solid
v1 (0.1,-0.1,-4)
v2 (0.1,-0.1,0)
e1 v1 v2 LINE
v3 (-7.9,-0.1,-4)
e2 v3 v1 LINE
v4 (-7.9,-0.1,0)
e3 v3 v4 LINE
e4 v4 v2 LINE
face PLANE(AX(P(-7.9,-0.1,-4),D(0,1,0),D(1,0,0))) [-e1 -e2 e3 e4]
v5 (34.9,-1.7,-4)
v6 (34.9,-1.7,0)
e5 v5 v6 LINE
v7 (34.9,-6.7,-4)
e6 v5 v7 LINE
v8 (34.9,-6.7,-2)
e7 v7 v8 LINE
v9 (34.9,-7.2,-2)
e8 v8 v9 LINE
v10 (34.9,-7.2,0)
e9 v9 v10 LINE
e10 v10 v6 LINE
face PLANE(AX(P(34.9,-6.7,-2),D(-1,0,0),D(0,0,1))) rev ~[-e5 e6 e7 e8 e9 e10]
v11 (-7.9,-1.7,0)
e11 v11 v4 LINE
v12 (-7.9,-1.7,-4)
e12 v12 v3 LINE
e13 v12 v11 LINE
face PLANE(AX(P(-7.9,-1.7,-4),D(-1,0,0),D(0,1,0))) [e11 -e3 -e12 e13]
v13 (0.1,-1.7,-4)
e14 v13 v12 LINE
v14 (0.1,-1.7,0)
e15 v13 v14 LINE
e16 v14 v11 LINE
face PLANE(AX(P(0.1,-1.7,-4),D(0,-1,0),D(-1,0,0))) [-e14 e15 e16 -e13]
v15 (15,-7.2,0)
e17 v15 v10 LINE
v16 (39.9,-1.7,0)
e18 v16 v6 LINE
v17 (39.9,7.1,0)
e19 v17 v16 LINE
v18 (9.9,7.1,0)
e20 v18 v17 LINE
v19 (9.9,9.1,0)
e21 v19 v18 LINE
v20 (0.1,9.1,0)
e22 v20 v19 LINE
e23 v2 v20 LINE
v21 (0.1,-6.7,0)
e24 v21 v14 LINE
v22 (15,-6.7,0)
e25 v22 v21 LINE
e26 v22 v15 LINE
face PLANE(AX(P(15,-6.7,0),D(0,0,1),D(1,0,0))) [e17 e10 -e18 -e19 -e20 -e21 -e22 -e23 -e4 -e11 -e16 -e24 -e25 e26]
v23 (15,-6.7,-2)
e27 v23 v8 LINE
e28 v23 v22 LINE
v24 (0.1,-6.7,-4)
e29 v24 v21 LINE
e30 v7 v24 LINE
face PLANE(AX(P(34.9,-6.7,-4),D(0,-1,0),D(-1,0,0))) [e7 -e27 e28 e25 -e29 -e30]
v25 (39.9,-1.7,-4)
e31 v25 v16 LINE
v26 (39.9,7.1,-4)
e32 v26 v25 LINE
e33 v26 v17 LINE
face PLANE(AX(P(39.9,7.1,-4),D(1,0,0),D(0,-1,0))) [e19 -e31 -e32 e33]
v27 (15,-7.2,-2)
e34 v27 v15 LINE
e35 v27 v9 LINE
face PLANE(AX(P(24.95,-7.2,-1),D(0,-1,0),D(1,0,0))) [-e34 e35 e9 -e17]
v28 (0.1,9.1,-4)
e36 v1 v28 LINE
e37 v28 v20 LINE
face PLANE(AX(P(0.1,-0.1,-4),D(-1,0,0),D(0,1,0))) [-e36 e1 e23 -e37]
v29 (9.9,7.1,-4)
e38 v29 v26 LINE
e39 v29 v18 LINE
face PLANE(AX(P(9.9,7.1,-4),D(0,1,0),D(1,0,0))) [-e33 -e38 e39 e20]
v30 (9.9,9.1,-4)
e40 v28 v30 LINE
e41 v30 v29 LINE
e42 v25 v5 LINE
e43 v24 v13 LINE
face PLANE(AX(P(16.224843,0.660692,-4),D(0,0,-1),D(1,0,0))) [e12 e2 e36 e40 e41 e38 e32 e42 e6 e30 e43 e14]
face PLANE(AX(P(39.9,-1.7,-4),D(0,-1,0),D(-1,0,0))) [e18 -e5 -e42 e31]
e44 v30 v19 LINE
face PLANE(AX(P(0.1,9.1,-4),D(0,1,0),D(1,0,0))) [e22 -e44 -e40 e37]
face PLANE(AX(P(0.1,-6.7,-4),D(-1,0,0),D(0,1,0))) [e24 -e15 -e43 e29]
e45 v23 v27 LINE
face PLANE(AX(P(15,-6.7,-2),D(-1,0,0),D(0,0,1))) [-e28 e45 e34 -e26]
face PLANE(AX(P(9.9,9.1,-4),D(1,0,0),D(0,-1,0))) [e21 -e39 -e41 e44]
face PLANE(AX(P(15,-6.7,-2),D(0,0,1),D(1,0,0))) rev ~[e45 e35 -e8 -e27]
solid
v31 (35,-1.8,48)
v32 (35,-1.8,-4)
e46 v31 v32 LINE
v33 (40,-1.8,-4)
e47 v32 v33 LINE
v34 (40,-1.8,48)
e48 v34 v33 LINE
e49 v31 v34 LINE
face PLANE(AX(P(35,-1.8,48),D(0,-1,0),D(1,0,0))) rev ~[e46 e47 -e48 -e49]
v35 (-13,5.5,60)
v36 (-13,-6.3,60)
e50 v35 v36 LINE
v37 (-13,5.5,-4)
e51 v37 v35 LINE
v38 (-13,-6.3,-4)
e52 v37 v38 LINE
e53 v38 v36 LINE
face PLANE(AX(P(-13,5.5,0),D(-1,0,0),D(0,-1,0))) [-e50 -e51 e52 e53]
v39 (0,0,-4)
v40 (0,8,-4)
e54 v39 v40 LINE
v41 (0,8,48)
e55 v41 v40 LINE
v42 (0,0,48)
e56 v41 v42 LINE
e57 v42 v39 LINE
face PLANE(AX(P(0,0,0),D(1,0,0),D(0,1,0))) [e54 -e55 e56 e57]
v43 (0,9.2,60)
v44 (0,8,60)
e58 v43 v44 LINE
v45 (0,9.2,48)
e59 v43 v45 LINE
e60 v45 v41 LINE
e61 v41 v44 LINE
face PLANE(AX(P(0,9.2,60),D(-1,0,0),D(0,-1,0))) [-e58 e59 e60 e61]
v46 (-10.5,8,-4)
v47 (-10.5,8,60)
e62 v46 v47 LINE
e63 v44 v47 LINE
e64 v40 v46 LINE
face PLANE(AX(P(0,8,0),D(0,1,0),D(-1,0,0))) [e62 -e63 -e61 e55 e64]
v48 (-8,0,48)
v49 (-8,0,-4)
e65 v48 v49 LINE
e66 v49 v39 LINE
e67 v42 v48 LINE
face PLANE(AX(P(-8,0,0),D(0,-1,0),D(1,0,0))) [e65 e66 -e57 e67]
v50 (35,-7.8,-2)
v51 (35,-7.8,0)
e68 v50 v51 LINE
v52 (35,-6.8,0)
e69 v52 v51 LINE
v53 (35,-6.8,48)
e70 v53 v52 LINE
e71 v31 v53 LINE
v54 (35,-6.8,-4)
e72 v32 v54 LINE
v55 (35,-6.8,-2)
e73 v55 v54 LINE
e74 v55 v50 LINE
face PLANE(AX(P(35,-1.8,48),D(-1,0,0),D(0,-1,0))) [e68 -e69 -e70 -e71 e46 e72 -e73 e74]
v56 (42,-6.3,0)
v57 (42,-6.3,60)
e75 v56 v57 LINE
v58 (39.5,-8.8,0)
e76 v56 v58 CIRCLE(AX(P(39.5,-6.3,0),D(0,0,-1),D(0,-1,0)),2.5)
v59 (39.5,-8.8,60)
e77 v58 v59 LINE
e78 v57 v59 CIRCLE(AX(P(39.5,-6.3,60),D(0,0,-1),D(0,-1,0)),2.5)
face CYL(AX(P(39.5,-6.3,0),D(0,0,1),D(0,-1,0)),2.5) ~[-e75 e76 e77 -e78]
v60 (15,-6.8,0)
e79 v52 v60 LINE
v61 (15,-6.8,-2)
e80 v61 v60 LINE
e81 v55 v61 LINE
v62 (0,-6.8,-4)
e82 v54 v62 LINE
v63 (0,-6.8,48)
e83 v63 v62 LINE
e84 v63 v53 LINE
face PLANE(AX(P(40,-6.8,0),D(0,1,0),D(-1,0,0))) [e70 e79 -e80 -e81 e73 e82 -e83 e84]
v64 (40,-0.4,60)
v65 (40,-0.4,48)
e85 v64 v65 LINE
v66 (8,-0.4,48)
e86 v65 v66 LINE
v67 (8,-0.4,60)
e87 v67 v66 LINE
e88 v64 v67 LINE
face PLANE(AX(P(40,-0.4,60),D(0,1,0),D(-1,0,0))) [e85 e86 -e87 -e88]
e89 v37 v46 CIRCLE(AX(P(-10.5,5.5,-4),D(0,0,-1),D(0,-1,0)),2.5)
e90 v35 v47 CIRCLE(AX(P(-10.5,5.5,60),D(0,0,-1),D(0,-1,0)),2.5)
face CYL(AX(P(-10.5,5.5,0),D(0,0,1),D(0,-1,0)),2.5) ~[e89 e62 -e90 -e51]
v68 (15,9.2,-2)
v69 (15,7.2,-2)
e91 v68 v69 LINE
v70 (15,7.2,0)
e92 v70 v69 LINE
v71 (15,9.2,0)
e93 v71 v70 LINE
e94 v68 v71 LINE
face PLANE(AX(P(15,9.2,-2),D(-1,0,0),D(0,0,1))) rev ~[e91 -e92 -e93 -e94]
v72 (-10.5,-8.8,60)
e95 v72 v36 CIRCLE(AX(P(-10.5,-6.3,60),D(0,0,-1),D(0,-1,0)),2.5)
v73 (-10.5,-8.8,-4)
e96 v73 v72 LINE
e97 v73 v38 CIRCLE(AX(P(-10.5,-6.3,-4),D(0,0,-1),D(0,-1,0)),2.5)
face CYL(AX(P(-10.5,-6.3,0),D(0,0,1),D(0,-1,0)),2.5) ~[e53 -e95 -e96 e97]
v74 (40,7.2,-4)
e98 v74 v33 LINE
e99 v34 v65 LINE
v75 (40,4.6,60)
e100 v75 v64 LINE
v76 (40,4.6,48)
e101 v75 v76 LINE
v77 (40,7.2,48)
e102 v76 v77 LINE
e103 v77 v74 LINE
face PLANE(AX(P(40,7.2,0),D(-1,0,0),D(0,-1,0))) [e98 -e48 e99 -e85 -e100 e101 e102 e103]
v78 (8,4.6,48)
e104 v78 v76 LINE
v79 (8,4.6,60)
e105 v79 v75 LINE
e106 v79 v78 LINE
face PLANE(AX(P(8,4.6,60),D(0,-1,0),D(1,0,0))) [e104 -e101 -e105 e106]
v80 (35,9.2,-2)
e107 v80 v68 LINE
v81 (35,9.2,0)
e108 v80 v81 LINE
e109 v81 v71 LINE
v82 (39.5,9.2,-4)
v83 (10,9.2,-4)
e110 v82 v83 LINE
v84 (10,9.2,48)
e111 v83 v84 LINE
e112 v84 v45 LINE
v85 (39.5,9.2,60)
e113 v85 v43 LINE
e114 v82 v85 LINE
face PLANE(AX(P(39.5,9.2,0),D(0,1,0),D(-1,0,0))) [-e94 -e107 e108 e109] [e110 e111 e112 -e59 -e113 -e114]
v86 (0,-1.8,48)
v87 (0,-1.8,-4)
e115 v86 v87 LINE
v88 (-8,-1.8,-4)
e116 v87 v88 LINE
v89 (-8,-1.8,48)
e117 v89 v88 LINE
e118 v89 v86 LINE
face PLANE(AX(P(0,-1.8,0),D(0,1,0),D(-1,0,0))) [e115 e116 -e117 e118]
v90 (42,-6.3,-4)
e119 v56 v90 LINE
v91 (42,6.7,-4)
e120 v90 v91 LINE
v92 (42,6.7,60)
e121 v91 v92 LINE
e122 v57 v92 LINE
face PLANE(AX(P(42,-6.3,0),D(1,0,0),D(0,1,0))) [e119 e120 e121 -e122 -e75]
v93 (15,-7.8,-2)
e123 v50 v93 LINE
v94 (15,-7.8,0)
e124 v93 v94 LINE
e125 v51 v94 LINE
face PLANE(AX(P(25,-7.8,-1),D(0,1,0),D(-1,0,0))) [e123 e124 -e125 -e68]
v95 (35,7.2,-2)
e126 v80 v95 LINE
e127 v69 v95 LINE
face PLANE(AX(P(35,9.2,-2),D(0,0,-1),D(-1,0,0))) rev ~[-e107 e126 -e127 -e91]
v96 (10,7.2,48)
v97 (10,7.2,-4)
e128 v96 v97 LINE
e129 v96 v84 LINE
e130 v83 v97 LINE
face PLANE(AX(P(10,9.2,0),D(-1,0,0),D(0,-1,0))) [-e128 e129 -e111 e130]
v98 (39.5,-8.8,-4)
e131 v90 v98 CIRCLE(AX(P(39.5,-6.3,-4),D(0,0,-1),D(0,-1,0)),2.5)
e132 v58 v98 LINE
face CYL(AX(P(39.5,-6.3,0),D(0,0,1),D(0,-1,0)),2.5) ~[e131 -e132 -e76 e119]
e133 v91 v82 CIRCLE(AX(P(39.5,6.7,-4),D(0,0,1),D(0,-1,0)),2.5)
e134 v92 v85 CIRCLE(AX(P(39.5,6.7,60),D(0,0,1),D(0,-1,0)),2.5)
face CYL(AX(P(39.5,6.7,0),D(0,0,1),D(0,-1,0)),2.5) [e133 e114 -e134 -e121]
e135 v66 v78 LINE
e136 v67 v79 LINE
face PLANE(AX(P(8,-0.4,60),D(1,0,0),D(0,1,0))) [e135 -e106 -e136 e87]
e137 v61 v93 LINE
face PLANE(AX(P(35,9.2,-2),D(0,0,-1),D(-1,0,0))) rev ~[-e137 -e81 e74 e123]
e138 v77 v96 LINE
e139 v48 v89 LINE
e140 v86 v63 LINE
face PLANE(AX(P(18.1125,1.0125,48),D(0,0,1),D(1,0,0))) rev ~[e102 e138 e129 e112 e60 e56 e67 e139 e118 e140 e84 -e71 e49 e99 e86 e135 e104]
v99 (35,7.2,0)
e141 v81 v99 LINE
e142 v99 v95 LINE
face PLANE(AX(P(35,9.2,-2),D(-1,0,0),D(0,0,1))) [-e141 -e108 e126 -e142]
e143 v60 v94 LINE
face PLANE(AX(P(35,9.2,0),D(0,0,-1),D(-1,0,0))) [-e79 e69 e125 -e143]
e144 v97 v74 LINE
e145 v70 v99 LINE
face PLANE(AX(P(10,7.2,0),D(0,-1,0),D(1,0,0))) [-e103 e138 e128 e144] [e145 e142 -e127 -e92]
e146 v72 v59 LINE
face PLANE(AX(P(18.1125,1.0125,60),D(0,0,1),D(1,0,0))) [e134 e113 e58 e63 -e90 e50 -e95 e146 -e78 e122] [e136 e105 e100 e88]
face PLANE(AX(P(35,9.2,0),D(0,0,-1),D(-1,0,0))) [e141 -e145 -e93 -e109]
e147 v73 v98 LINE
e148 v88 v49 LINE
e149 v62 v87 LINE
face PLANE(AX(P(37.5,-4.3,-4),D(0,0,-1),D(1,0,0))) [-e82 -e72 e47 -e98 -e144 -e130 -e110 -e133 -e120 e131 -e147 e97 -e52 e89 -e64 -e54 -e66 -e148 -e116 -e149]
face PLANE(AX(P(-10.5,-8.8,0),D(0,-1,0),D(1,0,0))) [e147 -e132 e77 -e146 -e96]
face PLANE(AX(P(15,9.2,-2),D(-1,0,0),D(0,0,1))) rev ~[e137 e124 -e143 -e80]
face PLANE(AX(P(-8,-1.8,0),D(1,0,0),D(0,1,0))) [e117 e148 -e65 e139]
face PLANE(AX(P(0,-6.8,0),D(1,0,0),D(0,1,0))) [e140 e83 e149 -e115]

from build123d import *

# Parameters (mm, degrees)
F1_DEPTH  = 60
F3_DEPTH  = 12
F4_R      = 2.5
F5_DEPTH  = 4
F6_W      = 5
F6_H      = 5
F7_DEPTH  = 52
F8_W      = 20
F8_H      = 2
F9_DEPTH  = 17
F12_DEPTH = 4
F14_W     = 19.9
F14_H     = 2
F15_DEPTH = 0.5


# Not quite as in the source:
# - a feature names something its author has since deleted; it is built from what else it names


with BuildPart() as f1:
    # F0 (on Top) → F1 (new body)
    with BuildSketch(Plane.XY):
        Polygon((-8, 0), (0, 0), (0, 8), (-8, 8), (-13, 8), (-13, -6.8), (-13, -8.8), (42, -8.8), (42, 9.2), (10, 9.2), (10, 7.2), (40, 7.2), (40, -6.8), (0, -6.8), (0, -1.8), (-8, -1.8), align=None)
    extrude(amount=F1_DEPTH)

    # F2 (on face) → F3 (join)
    with BuildSketch(Plane.XY.offset(60)):
        Polygon((40, -0.4), (8, -0.4), (8, 4.6), (40, 4.6), (40, 7.2), (10, 7.2), (10, 9.2), (0, 9.2), (0, 8), (0, 0), (-8, 0), (-8, -1.8), (0, -1.8), (0, -6.8), (40, -6.8), align=None)
    extrude(amount=-F3_DEPTH)

    # F4
    f4_edges = [f1.edges().sort_by_distance(p)[0] for p in [
        (42, 9.2, 30),
        (42, -8.8, 30),
        (-13, -8.8, 30),
        (-13, 8, 30),
    ]]
    fillet(f4_edges, radius=F4_R)

    # F5 (add): a face of the model
    f5_faces = [f1.faces().sort_by_distance(p)[0] for p in [
        (-5.25, 7.4212945482, 0),
    ]]
    extrude(f5_faces, amount=F5_DEPTH)

    # F6 (on face) → F7 (join)
    with BuildSketch(Plane(origin=(0, 0, 48), x_dir=(1, 0, 0), z_dir=(0, 0, -1))):
        with Locations((37.5, 4.3)):
            Rectangle(F6_W, F6_H)
    extrude(amount=F7_DEPTH)

    # F8 (on face) → F9 (cut)
    with BuildSketch(Plane(origin=(0, 9.2, 0), x_dir=(-1, 0, 0), z_dir=(0, 1, 0))):
        with Locations((-25, -1)):
            Rectangle(F8_W, F8_H)
    extrude(amount=-F9_DEPTH, mode=Mode.SUBTRACT)


with BuildPart() as f12:
    # F11 (on face) → F12 (new body)
    with BuildSketch(Plane(origin=(0, 0, -4), x_dir=(1, 0, 0), z_dir=(0, 0, -1))):
        Polygon((9.9, -9.1), (9.9, -7.1), (39.9, -7.1), (39.9, 1.7), (34.9, 1.7), (34.9, 6.7), (0.1, 6.7), (0.1, 1.7), (-7.9, 1.7), (-7.9, 0.1), (0.1, 0.1), (0.1, -0.2000001237), (0.1, -9.1), align=None)
    extrude(amount=-F12_DEPTH)

    # F14 (on face) → F15 (join)
    with BuildSketch(Plane.XZ.offset(6.7)):
        with Locations((24.95, -1)):
            Rectangle(F14_W, F14_H)
    extrude(amount=F15_DEPTH)


solid = Compound([f1.part, f12.part])
